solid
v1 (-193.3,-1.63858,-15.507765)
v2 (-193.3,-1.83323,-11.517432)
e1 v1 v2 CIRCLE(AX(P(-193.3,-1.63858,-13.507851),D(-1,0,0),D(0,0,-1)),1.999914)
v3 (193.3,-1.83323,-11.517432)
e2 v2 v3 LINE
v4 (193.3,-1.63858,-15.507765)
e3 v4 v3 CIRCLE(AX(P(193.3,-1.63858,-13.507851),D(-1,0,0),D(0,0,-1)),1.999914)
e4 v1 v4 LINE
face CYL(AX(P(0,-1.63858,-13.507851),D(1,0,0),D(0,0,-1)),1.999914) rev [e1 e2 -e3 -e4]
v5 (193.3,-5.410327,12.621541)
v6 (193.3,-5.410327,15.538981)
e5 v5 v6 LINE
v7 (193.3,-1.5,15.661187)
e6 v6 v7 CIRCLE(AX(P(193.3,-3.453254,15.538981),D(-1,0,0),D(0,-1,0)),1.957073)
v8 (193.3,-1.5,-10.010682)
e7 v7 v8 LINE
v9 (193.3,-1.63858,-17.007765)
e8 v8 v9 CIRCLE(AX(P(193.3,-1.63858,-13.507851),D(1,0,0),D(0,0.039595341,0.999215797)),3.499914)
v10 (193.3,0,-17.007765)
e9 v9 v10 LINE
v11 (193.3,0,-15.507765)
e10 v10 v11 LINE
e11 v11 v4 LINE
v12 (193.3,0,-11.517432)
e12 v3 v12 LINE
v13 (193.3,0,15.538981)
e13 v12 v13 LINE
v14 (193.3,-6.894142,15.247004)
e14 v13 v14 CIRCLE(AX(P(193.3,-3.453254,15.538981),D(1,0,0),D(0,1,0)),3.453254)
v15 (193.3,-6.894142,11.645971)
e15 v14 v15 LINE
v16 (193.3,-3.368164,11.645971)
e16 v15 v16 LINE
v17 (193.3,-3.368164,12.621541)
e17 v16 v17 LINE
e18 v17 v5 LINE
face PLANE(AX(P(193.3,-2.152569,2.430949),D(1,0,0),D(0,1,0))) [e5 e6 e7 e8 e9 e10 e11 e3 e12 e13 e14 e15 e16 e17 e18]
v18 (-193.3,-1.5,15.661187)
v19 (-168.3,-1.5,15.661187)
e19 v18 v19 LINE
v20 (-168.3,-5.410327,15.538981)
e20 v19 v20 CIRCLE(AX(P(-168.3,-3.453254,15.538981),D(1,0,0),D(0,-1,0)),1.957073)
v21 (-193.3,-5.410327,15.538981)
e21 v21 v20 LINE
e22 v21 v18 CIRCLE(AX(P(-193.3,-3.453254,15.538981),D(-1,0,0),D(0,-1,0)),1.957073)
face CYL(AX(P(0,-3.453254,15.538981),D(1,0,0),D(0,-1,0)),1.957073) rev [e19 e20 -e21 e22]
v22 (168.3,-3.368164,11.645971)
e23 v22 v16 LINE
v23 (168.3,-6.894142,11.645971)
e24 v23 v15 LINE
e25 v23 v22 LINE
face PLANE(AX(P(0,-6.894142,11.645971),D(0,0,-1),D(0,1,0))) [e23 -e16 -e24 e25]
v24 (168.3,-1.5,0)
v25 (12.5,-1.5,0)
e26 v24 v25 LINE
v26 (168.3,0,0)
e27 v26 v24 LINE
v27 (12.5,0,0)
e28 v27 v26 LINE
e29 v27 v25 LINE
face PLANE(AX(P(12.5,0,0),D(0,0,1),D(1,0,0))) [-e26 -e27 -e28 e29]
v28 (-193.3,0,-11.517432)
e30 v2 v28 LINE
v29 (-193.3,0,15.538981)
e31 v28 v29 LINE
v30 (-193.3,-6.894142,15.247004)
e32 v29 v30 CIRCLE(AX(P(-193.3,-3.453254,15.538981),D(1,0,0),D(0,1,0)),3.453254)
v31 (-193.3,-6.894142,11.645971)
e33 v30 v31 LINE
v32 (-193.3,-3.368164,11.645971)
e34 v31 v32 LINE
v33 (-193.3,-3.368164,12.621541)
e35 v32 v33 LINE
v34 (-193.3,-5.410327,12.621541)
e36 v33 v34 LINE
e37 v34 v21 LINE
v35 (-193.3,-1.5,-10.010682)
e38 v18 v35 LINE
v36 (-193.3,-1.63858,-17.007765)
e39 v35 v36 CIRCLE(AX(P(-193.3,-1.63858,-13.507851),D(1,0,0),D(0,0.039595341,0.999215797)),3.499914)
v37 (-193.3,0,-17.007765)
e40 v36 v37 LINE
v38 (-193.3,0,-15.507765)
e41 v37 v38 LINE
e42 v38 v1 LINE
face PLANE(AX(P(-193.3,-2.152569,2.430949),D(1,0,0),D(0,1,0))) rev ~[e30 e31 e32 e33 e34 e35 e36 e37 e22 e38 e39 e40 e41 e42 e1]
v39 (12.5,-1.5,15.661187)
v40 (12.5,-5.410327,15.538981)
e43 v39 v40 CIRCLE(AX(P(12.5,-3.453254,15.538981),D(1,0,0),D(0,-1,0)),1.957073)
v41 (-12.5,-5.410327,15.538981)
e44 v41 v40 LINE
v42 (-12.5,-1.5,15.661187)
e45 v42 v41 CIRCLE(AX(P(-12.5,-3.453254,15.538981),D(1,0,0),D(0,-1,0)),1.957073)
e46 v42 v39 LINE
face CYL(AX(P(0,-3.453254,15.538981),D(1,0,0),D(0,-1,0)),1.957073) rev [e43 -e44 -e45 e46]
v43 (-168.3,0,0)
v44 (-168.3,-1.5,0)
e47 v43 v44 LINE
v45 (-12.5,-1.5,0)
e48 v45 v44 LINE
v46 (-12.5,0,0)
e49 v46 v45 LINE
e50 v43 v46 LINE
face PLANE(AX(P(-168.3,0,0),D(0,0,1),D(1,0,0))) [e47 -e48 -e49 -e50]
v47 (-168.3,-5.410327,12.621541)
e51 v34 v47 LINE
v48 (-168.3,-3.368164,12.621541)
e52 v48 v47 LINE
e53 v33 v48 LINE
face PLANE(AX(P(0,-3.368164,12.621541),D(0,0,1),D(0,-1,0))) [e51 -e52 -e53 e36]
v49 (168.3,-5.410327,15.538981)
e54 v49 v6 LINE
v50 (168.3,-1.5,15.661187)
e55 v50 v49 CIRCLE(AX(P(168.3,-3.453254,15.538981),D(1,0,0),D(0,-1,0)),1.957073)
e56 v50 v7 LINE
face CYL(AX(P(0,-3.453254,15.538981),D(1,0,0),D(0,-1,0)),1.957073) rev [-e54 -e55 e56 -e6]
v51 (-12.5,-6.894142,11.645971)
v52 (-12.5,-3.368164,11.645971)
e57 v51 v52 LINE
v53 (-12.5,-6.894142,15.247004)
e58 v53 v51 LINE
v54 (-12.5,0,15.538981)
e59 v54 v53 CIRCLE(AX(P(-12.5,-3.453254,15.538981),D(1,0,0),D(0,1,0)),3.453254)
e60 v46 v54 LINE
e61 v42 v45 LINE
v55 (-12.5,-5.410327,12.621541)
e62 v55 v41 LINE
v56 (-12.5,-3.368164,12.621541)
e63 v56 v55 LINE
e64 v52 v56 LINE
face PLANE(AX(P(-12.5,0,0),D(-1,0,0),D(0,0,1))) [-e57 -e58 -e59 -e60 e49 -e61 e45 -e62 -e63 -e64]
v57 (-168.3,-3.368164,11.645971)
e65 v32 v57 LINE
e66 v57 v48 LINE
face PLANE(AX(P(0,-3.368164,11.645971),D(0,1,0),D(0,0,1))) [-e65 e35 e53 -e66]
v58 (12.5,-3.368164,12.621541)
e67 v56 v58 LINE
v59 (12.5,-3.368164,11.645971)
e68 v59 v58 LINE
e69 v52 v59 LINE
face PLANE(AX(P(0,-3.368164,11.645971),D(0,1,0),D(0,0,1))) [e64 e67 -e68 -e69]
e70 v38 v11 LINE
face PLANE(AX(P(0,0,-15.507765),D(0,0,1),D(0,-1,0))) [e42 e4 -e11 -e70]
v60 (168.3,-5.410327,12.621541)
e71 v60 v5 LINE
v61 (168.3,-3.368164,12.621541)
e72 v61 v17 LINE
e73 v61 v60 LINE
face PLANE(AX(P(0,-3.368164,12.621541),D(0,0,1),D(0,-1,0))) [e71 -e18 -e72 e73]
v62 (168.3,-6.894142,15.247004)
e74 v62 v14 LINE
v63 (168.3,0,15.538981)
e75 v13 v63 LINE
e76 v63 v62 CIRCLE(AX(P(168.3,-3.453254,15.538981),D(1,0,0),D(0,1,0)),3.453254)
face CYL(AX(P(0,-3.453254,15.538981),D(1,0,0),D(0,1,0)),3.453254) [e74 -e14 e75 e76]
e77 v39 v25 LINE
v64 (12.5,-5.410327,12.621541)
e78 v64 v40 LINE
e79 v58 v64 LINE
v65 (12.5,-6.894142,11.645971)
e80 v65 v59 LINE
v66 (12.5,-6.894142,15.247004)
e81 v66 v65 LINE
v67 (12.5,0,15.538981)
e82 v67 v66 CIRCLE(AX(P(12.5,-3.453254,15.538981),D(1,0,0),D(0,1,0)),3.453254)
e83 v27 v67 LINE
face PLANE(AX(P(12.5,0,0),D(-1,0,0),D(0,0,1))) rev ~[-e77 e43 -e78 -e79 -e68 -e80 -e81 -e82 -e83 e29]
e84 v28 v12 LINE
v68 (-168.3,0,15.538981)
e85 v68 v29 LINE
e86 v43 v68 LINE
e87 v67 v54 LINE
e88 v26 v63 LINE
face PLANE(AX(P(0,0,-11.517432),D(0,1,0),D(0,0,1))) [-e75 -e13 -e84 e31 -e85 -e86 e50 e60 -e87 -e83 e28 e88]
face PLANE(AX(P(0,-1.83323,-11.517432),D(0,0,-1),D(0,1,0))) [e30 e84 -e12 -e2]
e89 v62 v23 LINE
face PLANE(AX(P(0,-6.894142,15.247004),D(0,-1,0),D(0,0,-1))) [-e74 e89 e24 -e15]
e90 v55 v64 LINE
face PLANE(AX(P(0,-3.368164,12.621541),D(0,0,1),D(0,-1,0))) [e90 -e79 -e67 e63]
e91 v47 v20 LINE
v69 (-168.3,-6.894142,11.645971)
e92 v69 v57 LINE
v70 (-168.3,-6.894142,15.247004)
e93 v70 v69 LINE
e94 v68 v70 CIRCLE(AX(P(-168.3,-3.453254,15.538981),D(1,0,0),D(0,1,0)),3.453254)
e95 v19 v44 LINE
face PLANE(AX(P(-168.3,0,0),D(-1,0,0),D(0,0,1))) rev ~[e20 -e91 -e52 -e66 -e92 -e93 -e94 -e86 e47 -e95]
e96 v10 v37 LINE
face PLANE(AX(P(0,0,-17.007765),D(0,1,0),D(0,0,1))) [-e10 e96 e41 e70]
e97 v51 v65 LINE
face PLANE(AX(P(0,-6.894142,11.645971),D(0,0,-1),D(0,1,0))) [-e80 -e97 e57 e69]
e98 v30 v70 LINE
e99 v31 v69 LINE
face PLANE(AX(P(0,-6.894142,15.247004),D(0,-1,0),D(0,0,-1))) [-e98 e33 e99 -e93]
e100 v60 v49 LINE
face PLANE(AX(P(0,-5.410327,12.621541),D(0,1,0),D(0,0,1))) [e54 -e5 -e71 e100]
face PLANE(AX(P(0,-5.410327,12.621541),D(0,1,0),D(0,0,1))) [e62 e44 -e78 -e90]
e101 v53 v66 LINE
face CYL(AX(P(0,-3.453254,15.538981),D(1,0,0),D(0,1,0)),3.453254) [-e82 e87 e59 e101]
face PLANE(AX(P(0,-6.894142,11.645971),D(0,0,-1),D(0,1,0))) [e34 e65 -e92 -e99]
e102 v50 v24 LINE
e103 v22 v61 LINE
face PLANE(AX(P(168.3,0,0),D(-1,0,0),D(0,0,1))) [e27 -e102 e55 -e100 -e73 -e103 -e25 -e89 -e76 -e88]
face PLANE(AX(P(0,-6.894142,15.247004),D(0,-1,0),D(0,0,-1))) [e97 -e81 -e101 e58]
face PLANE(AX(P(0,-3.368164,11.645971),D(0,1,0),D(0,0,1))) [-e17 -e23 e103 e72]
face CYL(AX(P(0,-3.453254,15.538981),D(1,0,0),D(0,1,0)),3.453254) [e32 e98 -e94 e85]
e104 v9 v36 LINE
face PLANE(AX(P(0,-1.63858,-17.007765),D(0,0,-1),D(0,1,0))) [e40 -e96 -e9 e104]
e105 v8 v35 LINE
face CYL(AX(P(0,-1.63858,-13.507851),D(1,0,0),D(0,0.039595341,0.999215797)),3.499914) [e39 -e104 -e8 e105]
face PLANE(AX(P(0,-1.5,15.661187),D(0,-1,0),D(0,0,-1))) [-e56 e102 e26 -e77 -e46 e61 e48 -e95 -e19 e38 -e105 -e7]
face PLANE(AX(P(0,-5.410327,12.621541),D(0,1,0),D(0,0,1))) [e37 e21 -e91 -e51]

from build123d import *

# Parameters (mm, degrees)
F1_DEPTH      = 193.3
F2_W          = 155.8
F2_H          = 27.6261721705
F2_H_2        = 29.0520395572
F3_DEPTH      = 392
F3_DEPTH_BACK = 6.9075074824


# Not quite as in the source:
# - an extrude ends at something that could not be found from the text; its depth is read off the source's solid


with BuildPart() as f1:
    # F0 (on Right) → F1 (new body, symmetric)
    with BuildSketch(Plane.YZ):
        with BuildLine():
            Line((0, -17.0077651882), (0, -15.5077651882))
            Line((0, -15.5077651882), (-1.6385802936, -15.5077651882))
            ThreePointArc((-1.6385802936, -15.5077651882), (-3.6361192163, -13.605291718), (-1.8332301129, -11.5174320644))
            Line((-1.8332301129, -11.5174320644), (0, -11.5174320644))
            Line((0, -11.5174320644), (0, 15.5389810706))
            ThreePointArc((0, 15.5389810706), (-3.59937308, 18.9891420146), (-6.8941418337, 15.2470041272))
            Line((-6.8941418337, 15.2470041272), (-6.8941418337, 11.6459712901))
            Line((-6.8941418337, 11.6459712901), (-3.368163947, 11.6459712901))
            Line((-3.368163947, 11.6459712901), (-3.368163947, 12.6215412629))
            Line((-3.368163947, 12.6215412629), (-5.4103266448, 12.6215412629))
            Line((-5.4103266448, 12.6215412629), (-5.4103266448, 15.5389810706))
            ThreePointArc((-5.4103266448, 15.5389810706), (-3.5143862992, 17.4950989506), (-1.5, 15.661186523))
            Line((-1.5, 15.661186523), (-1.5, -10.0106816226))
            ThreePointArc((-1.5, -10.0106816226), (-5.1378081699, -13.4385473486), (-1.6385802936, -17.0077651882))
            Line((-1.6385802936, -17.0077651882), (0, -17.0077651882))
        make_face()
    extrude(amount=F1_DEPTH, both=True)

    # F2 (on Front) → F3 (cut, two sides)
    with BuildSketch(Plane.XZ) as f3_sk:
        with Locations((-90.4, 13.8130860853)):
            Rectangle(F2_W, F2_H)
        with Locations((90.4, 14.5260197786)):
            Rectangle(F2_W, F2_H_2)
    extrude(amount=-F3_DEPTH, mode=Mode.SUBTRACT)
    extrude(f3_sk.sketch, amount=F3_DEPTH_BACK, mode=Mode.SUBTRACT)


solid = f1.part
